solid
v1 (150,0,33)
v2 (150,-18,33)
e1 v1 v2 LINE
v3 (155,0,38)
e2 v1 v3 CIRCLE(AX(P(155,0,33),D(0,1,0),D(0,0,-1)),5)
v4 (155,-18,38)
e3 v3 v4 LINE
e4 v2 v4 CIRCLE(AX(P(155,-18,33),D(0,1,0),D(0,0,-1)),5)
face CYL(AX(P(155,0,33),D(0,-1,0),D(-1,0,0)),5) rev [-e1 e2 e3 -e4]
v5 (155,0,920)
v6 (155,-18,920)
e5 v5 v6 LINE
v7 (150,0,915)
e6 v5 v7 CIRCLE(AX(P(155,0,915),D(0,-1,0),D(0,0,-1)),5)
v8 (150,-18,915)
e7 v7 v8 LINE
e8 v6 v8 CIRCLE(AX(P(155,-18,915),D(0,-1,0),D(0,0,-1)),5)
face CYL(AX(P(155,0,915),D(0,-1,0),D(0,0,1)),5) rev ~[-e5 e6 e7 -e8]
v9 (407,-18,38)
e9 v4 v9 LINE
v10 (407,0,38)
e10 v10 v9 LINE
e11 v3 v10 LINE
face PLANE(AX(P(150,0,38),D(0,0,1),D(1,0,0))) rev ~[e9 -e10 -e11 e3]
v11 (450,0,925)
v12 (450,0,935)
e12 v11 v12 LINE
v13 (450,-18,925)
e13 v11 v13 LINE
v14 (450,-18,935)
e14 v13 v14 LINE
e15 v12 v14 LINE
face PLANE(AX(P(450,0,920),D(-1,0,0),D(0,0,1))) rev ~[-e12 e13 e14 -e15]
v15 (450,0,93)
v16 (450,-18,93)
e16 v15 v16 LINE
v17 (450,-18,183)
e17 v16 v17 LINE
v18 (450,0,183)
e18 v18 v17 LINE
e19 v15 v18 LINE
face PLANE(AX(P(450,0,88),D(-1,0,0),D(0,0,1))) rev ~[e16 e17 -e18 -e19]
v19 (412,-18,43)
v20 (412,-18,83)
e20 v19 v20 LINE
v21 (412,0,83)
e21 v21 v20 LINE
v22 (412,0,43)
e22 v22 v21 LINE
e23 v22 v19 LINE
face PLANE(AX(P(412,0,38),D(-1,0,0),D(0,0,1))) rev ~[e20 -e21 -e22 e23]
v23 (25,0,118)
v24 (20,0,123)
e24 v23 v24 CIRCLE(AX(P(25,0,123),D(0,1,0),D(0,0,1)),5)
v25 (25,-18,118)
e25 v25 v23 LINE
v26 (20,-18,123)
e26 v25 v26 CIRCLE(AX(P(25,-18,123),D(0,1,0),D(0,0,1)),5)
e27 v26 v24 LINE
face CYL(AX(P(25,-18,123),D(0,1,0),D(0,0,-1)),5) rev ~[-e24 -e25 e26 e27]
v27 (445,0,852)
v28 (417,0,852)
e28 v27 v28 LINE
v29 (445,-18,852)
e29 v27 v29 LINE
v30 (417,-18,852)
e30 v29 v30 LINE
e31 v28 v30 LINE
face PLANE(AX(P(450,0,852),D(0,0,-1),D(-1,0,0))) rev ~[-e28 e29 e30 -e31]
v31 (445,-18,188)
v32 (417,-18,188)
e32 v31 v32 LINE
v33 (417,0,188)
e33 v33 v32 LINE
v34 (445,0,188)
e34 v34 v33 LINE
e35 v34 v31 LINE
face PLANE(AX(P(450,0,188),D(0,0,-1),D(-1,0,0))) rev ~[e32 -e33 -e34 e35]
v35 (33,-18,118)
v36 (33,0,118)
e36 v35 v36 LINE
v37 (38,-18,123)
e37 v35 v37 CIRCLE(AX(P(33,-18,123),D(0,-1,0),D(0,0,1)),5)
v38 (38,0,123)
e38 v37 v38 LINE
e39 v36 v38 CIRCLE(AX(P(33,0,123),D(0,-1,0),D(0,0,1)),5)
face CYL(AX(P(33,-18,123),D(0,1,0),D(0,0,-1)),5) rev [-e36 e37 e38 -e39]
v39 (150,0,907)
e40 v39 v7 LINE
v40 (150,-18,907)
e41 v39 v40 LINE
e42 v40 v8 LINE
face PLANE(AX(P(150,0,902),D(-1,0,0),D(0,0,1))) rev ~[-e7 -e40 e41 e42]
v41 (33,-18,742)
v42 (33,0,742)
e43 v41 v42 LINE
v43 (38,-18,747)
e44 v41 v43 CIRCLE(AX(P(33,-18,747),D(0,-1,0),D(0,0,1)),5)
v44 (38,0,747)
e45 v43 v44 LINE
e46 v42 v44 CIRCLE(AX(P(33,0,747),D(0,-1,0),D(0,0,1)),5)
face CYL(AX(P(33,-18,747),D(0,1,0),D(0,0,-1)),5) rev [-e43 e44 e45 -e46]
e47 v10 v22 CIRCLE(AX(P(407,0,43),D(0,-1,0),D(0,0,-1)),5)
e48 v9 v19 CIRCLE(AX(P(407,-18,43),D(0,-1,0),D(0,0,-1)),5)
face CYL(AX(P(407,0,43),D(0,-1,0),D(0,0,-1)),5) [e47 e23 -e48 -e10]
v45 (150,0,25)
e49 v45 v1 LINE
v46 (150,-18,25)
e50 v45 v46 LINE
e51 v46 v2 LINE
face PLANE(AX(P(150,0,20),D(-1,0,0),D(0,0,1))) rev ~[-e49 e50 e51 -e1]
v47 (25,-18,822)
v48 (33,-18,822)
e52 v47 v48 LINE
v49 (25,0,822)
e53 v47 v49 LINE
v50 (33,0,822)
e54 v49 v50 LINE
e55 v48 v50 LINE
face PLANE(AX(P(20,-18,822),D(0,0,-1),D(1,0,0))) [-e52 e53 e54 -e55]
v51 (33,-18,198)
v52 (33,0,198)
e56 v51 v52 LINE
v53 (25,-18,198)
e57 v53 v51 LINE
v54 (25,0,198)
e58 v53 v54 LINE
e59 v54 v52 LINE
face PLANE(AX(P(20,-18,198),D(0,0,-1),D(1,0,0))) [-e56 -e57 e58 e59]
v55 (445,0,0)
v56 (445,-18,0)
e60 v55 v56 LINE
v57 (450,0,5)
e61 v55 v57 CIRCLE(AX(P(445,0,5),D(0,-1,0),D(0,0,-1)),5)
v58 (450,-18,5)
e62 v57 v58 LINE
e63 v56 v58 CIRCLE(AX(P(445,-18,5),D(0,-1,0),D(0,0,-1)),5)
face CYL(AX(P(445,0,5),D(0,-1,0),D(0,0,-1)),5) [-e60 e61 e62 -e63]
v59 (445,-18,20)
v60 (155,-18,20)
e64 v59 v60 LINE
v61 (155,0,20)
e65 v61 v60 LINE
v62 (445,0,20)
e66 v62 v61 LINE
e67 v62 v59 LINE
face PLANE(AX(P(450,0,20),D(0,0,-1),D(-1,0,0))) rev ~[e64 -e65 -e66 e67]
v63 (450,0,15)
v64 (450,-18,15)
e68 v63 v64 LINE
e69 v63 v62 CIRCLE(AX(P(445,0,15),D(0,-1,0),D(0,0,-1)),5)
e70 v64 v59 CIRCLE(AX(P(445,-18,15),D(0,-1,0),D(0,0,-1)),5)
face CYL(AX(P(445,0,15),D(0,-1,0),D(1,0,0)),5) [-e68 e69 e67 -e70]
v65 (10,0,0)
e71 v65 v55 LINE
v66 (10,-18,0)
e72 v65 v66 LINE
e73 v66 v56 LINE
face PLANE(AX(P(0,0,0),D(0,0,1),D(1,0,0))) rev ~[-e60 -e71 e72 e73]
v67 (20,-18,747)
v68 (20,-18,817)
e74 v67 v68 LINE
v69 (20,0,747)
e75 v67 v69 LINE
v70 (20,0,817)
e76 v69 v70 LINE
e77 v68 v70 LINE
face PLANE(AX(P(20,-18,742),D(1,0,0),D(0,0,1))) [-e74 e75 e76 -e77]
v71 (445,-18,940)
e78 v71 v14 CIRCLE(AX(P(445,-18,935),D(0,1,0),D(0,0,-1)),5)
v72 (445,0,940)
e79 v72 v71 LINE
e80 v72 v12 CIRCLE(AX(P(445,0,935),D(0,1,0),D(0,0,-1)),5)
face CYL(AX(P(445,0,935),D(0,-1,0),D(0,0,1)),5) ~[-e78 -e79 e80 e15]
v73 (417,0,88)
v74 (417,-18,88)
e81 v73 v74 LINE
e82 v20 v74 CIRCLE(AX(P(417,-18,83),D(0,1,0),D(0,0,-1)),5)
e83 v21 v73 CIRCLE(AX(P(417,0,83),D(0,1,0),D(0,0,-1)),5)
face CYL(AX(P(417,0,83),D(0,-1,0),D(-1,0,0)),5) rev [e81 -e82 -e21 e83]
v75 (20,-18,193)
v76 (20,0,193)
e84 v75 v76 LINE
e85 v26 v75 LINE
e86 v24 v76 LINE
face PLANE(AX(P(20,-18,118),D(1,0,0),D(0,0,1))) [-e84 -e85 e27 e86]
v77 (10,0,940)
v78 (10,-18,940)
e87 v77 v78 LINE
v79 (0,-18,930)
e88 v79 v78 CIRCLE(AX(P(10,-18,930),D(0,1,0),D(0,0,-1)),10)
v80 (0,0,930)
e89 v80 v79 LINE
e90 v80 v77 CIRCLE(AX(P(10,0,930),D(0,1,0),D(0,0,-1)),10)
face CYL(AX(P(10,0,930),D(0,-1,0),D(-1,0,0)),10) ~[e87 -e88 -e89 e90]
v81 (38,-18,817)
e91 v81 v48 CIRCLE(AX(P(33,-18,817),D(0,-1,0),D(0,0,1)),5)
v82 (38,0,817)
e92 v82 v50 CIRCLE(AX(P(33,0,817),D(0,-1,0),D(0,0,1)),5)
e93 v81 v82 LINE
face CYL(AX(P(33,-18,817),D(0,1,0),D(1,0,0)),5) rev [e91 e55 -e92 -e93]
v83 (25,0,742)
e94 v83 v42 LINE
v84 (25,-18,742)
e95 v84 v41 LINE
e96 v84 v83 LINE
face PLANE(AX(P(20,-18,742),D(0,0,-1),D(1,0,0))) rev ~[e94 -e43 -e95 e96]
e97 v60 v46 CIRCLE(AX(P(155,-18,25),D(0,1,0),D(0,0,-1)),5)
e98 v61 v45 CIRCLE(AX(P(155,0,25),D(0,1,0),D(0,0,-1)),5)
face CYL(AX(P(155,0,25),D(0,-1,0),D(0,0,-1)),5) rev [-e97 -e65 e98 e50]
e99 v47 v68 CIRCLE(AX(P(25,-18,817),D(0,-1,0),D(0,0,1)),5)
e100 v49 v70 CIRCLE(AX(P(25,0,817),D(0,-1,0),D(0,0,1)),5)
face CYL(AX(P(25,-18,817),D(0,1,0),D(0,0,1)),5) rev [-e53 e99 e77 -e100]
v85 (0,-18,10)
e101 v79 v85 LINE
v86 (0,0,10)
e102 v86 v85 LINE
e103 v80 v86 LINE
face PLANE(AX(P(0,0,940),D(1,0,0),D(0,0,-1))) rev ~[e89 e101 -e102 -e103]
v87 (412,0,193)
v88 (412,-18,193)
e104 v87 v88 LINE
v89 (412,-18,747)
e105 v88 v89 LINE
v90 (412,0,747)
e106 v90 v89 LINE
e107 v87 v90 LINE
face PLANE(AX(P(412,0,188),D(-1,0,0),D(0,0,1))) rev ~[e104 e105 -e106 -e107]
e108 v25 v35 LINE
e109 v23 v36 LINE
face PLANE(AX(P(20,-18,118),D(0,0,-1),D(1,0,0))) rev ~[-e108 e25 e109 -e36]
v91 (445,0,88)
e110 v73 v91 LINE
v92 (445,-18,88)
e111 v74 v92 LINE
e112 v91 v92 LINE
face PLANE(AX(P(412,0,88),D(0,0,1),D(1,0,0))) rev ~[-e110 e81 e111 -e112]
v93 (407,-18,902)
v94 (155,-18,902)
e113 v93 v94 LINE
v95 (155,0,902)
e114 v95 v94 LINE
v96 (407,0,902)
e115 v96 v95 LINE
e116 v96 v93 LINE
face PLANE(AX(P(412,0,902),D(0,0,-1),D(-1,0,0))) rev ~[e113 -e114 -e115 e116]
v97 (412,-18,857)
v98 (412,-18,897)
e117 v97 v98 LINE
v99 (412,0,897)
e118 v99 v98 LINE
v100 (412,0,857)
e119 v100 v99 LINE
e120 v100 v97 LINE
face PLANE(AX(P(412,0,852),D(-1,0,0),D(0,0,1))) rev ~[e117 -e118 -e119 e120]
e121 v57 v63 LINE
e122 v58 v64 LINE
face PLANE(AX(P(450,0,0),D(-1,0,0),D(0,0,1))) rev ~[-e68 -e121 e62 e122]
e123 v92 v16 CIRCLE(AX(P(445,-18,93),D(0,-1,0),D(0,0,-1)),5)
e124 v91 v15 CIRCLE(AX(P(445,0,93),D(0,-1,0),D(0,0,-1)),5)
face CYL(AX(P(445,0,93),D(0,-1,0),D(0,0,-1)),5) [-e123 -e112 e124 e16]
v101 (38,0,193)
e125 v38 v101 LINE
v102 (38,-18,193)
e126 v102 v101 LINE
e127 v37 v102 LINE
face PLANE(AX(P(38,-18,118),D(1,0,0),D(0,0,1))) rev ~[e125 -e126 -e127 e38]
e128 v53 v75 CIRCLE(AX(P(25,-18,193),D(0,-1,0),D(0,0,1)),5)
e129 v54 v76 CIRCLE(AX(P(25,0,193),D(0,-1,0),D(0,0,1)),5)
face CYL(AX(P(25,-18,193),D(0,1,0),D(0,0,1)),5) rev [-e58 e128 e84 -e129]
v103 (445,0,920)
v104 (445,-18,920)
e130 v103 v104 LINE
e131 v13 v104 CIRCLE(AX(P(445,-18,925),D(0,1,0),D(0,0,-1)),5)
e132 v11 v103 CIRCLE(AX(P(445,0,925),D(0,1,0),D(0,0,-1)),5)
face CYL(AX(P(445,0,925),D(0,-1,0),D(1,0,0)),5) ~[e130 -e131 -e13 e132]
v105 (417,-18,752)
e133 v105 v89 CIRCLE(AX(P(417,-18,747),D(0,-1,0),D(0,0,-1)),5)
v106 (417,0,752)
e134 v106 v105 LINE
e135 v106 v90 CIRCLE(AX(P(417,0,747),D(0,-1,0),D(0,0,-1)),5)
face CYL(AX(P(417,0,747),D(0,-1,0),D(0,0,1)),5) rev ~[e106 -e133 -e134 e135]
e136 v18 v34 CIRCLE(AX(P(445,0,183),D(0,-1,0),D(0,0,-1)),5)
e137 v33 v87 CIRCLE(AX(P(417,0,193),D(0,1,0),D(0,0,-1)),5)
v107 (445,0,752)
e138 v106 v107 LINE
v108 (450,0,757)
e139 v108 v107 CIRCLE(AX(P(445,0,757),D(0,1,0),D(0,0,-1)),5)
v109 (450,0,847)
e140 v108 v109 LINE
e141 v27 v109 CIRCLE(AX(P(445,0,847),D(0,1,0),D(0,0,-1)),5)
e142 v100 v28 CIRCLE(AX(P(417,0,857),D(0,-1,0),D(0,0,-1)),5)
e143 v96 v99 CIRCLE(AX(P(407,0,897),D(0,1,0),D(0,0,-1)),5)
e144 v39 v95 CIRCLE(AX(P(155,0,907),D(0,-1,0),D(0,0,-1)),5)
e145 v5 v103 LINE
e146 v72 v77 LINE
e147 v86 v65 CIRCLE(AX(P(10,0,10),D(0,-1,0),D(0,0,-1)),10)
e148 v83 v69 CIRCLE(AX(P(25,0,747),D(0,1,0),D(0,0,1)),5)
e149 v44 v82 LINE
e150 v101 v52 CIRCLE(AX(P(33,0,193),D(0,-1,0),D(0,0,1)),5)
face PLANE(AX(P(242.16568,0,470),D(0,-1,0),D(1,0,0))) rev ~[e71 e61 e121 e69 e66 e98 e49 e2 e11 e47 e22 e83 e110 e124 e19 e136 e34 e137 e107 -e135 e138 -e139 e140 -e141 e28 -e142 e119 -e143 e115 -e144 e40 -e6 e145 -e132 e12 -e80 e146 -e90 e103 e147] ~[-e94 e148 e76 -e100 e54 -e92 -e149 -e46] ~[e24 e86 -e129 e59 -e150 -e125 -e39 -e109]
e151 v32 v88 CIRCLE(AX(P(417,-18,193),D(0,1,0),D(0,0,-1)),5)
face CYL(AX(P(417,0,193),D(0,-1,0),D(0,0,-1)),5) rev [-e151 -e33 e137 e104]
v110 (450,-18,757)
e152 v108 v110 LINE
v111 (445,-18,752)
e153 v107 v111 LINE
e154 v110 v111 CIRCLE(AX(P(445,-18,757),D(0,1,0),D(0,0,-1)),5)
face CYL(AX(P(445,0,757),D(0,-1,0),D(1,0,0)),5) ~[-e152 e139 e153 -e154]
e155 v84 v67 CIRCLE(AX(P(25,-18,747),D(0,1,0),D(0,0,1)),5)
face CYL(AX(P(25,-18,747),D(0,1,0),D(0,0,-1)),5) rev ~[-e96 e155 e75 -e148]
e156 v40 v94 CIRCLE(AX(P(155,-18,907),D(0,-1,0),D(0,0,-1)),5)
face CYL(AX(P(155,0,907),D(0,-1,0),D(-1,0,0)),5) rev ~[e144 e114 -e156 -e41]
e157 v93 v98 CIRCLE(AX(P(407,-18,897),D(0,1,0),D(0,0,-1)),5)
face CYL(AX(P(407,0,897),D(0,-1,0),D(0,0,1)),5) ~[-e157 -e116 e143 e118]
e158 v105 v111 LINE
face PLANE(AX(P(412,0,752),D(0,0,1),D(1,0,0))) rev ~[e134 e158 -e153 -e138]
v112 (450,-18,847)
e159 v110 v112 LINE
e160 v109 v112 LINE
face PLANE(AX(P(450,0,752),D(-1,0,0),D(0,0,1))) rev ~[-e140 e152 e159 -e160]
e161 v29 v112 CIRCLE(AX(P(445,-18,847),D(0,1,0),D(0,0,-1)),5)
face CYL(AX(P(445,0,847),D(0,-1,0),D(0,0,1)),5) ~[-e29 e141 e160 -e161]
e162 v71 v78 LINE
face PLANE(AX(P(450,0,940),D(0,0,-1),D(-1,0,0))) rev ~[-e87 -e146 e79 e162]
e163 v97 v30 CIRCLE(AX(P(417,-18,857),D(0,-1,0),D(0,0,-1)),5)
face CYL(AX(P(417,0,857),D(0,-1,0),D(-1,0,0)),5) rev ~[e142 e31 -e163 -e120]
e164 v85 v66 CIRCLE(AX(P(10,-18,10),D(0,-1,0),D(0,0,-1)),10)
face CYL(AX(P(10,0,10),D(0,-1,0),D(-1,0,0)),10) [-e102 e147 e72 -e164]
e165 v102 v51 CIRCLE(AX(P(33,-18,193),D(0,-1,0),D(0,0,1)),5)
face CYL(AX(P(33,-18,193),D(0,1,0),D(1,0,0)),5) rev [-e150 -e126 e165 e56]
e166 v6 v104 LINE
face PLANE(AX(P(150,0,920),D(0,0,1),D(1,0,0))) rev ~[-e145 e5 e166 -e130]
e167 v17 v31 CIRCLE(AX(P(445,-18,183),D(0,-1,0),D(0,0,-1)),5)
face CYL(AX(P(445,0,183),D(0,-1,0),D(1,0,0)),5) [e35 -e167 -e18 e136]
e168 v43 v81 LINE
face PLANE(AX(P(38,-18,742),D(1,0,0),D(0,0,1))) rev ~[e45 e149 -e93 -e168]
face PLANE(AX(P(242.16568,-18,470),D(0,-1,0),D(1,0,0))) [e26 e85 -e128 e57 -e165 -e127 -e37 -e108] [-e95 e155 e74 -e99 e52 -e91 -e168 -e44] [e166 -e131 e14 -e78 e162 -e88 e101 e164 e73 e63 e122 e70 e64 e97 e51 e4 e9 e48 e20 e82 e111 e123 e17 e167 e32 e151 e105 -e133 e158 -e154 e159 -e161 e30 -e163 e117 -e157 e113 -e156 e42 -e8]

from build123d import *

# Parameters (mm, degrees)
F1_DEPTH = 18
F2_W     = 18
F2_H     = 80
F3_DEPTH = 25
F4_R     = 10
F5_R     = 5
F6_R     = 5
F7_R     = 5


# Not quite as in the source:
# - two fillets or chamfers of one size are made in one step


with BuildPart() as f1:
    # F0 (on Front) → F1 (new body)
    with BuildSketch(Plane.XZ):
        Polygon((0, 940), (0, 0), (450, 0), (450, 20), (150, 20), (150, 38), (412, 38), (412, 88), (450, 88), (450, 188), (412, 188), (412, 752), (450, 752), (450, 852), (412, 852), (412, 902), (150, 902), (150, 920), (450, 920), (450, 940), align=None)
    extrude(amount=F1_DEPTH)

    # F2 (on face) → F3 (cut)
    with BuildSketch(Plane.XZ.offset(18)):
        with Locations((29, 782)):
            Rectangle(F2_W, F2_H)
        with Locations((29, 158)):
            Rectangle(F2_W, F2_H)
    extrude(amount=-F3_DEPTH, mode=Mode.SUBTRACT)

    # F4
    f4_edges = [f1.edges().sort_by_distance(p)[0] for p in [
        (0, -9, 0),
        (0, -9, 940),
    ]]
    fillet(f4_edges, radius=F4_R)

    # F5
    f5_edges = [f1.edges().sort_by_distance(p)[0] for p in [
        (20, -9, 822),
        (38, -9, 822),
        (20, -9, 742),
        (38, -9, 742),
    ]]
    fillet(f5_edges, radius=F5_R)

    # F6
    f6_edges = [f1.edges().sort_by_distance(p)[0] for p in [
        (38, -9, 198),
        (20, -9, 198),
        (20, -9, 118),
        (38, -9, 118),
    ]]
    fillet(f6_edges, radius=F6_R)

    # F7
    f7_edges = [f1.edges().sort_by_distance(p)[0] for p in [
        (450, -9, 0),
        (450, -9, 20),
        (150, -9, 38),
        (150, -9, 20),
        (450, -9, 940),
        (450, -9, 920),
        (150, -9, 920),
        (150, -9, 902),
        (412, -9, 902),
        (412, -9, 38),
        (412, -9, 852),
        (412, -9, 88),
        (450, -9, 852),
        (450, -9, 88),
        (450, -9, 752),
        (450, -9, 188),
        (412, -9, 752),
        (412, -9, 188),
    ]]
    fillet(f7_edges, radius=F7_R)


solid = f1.part
